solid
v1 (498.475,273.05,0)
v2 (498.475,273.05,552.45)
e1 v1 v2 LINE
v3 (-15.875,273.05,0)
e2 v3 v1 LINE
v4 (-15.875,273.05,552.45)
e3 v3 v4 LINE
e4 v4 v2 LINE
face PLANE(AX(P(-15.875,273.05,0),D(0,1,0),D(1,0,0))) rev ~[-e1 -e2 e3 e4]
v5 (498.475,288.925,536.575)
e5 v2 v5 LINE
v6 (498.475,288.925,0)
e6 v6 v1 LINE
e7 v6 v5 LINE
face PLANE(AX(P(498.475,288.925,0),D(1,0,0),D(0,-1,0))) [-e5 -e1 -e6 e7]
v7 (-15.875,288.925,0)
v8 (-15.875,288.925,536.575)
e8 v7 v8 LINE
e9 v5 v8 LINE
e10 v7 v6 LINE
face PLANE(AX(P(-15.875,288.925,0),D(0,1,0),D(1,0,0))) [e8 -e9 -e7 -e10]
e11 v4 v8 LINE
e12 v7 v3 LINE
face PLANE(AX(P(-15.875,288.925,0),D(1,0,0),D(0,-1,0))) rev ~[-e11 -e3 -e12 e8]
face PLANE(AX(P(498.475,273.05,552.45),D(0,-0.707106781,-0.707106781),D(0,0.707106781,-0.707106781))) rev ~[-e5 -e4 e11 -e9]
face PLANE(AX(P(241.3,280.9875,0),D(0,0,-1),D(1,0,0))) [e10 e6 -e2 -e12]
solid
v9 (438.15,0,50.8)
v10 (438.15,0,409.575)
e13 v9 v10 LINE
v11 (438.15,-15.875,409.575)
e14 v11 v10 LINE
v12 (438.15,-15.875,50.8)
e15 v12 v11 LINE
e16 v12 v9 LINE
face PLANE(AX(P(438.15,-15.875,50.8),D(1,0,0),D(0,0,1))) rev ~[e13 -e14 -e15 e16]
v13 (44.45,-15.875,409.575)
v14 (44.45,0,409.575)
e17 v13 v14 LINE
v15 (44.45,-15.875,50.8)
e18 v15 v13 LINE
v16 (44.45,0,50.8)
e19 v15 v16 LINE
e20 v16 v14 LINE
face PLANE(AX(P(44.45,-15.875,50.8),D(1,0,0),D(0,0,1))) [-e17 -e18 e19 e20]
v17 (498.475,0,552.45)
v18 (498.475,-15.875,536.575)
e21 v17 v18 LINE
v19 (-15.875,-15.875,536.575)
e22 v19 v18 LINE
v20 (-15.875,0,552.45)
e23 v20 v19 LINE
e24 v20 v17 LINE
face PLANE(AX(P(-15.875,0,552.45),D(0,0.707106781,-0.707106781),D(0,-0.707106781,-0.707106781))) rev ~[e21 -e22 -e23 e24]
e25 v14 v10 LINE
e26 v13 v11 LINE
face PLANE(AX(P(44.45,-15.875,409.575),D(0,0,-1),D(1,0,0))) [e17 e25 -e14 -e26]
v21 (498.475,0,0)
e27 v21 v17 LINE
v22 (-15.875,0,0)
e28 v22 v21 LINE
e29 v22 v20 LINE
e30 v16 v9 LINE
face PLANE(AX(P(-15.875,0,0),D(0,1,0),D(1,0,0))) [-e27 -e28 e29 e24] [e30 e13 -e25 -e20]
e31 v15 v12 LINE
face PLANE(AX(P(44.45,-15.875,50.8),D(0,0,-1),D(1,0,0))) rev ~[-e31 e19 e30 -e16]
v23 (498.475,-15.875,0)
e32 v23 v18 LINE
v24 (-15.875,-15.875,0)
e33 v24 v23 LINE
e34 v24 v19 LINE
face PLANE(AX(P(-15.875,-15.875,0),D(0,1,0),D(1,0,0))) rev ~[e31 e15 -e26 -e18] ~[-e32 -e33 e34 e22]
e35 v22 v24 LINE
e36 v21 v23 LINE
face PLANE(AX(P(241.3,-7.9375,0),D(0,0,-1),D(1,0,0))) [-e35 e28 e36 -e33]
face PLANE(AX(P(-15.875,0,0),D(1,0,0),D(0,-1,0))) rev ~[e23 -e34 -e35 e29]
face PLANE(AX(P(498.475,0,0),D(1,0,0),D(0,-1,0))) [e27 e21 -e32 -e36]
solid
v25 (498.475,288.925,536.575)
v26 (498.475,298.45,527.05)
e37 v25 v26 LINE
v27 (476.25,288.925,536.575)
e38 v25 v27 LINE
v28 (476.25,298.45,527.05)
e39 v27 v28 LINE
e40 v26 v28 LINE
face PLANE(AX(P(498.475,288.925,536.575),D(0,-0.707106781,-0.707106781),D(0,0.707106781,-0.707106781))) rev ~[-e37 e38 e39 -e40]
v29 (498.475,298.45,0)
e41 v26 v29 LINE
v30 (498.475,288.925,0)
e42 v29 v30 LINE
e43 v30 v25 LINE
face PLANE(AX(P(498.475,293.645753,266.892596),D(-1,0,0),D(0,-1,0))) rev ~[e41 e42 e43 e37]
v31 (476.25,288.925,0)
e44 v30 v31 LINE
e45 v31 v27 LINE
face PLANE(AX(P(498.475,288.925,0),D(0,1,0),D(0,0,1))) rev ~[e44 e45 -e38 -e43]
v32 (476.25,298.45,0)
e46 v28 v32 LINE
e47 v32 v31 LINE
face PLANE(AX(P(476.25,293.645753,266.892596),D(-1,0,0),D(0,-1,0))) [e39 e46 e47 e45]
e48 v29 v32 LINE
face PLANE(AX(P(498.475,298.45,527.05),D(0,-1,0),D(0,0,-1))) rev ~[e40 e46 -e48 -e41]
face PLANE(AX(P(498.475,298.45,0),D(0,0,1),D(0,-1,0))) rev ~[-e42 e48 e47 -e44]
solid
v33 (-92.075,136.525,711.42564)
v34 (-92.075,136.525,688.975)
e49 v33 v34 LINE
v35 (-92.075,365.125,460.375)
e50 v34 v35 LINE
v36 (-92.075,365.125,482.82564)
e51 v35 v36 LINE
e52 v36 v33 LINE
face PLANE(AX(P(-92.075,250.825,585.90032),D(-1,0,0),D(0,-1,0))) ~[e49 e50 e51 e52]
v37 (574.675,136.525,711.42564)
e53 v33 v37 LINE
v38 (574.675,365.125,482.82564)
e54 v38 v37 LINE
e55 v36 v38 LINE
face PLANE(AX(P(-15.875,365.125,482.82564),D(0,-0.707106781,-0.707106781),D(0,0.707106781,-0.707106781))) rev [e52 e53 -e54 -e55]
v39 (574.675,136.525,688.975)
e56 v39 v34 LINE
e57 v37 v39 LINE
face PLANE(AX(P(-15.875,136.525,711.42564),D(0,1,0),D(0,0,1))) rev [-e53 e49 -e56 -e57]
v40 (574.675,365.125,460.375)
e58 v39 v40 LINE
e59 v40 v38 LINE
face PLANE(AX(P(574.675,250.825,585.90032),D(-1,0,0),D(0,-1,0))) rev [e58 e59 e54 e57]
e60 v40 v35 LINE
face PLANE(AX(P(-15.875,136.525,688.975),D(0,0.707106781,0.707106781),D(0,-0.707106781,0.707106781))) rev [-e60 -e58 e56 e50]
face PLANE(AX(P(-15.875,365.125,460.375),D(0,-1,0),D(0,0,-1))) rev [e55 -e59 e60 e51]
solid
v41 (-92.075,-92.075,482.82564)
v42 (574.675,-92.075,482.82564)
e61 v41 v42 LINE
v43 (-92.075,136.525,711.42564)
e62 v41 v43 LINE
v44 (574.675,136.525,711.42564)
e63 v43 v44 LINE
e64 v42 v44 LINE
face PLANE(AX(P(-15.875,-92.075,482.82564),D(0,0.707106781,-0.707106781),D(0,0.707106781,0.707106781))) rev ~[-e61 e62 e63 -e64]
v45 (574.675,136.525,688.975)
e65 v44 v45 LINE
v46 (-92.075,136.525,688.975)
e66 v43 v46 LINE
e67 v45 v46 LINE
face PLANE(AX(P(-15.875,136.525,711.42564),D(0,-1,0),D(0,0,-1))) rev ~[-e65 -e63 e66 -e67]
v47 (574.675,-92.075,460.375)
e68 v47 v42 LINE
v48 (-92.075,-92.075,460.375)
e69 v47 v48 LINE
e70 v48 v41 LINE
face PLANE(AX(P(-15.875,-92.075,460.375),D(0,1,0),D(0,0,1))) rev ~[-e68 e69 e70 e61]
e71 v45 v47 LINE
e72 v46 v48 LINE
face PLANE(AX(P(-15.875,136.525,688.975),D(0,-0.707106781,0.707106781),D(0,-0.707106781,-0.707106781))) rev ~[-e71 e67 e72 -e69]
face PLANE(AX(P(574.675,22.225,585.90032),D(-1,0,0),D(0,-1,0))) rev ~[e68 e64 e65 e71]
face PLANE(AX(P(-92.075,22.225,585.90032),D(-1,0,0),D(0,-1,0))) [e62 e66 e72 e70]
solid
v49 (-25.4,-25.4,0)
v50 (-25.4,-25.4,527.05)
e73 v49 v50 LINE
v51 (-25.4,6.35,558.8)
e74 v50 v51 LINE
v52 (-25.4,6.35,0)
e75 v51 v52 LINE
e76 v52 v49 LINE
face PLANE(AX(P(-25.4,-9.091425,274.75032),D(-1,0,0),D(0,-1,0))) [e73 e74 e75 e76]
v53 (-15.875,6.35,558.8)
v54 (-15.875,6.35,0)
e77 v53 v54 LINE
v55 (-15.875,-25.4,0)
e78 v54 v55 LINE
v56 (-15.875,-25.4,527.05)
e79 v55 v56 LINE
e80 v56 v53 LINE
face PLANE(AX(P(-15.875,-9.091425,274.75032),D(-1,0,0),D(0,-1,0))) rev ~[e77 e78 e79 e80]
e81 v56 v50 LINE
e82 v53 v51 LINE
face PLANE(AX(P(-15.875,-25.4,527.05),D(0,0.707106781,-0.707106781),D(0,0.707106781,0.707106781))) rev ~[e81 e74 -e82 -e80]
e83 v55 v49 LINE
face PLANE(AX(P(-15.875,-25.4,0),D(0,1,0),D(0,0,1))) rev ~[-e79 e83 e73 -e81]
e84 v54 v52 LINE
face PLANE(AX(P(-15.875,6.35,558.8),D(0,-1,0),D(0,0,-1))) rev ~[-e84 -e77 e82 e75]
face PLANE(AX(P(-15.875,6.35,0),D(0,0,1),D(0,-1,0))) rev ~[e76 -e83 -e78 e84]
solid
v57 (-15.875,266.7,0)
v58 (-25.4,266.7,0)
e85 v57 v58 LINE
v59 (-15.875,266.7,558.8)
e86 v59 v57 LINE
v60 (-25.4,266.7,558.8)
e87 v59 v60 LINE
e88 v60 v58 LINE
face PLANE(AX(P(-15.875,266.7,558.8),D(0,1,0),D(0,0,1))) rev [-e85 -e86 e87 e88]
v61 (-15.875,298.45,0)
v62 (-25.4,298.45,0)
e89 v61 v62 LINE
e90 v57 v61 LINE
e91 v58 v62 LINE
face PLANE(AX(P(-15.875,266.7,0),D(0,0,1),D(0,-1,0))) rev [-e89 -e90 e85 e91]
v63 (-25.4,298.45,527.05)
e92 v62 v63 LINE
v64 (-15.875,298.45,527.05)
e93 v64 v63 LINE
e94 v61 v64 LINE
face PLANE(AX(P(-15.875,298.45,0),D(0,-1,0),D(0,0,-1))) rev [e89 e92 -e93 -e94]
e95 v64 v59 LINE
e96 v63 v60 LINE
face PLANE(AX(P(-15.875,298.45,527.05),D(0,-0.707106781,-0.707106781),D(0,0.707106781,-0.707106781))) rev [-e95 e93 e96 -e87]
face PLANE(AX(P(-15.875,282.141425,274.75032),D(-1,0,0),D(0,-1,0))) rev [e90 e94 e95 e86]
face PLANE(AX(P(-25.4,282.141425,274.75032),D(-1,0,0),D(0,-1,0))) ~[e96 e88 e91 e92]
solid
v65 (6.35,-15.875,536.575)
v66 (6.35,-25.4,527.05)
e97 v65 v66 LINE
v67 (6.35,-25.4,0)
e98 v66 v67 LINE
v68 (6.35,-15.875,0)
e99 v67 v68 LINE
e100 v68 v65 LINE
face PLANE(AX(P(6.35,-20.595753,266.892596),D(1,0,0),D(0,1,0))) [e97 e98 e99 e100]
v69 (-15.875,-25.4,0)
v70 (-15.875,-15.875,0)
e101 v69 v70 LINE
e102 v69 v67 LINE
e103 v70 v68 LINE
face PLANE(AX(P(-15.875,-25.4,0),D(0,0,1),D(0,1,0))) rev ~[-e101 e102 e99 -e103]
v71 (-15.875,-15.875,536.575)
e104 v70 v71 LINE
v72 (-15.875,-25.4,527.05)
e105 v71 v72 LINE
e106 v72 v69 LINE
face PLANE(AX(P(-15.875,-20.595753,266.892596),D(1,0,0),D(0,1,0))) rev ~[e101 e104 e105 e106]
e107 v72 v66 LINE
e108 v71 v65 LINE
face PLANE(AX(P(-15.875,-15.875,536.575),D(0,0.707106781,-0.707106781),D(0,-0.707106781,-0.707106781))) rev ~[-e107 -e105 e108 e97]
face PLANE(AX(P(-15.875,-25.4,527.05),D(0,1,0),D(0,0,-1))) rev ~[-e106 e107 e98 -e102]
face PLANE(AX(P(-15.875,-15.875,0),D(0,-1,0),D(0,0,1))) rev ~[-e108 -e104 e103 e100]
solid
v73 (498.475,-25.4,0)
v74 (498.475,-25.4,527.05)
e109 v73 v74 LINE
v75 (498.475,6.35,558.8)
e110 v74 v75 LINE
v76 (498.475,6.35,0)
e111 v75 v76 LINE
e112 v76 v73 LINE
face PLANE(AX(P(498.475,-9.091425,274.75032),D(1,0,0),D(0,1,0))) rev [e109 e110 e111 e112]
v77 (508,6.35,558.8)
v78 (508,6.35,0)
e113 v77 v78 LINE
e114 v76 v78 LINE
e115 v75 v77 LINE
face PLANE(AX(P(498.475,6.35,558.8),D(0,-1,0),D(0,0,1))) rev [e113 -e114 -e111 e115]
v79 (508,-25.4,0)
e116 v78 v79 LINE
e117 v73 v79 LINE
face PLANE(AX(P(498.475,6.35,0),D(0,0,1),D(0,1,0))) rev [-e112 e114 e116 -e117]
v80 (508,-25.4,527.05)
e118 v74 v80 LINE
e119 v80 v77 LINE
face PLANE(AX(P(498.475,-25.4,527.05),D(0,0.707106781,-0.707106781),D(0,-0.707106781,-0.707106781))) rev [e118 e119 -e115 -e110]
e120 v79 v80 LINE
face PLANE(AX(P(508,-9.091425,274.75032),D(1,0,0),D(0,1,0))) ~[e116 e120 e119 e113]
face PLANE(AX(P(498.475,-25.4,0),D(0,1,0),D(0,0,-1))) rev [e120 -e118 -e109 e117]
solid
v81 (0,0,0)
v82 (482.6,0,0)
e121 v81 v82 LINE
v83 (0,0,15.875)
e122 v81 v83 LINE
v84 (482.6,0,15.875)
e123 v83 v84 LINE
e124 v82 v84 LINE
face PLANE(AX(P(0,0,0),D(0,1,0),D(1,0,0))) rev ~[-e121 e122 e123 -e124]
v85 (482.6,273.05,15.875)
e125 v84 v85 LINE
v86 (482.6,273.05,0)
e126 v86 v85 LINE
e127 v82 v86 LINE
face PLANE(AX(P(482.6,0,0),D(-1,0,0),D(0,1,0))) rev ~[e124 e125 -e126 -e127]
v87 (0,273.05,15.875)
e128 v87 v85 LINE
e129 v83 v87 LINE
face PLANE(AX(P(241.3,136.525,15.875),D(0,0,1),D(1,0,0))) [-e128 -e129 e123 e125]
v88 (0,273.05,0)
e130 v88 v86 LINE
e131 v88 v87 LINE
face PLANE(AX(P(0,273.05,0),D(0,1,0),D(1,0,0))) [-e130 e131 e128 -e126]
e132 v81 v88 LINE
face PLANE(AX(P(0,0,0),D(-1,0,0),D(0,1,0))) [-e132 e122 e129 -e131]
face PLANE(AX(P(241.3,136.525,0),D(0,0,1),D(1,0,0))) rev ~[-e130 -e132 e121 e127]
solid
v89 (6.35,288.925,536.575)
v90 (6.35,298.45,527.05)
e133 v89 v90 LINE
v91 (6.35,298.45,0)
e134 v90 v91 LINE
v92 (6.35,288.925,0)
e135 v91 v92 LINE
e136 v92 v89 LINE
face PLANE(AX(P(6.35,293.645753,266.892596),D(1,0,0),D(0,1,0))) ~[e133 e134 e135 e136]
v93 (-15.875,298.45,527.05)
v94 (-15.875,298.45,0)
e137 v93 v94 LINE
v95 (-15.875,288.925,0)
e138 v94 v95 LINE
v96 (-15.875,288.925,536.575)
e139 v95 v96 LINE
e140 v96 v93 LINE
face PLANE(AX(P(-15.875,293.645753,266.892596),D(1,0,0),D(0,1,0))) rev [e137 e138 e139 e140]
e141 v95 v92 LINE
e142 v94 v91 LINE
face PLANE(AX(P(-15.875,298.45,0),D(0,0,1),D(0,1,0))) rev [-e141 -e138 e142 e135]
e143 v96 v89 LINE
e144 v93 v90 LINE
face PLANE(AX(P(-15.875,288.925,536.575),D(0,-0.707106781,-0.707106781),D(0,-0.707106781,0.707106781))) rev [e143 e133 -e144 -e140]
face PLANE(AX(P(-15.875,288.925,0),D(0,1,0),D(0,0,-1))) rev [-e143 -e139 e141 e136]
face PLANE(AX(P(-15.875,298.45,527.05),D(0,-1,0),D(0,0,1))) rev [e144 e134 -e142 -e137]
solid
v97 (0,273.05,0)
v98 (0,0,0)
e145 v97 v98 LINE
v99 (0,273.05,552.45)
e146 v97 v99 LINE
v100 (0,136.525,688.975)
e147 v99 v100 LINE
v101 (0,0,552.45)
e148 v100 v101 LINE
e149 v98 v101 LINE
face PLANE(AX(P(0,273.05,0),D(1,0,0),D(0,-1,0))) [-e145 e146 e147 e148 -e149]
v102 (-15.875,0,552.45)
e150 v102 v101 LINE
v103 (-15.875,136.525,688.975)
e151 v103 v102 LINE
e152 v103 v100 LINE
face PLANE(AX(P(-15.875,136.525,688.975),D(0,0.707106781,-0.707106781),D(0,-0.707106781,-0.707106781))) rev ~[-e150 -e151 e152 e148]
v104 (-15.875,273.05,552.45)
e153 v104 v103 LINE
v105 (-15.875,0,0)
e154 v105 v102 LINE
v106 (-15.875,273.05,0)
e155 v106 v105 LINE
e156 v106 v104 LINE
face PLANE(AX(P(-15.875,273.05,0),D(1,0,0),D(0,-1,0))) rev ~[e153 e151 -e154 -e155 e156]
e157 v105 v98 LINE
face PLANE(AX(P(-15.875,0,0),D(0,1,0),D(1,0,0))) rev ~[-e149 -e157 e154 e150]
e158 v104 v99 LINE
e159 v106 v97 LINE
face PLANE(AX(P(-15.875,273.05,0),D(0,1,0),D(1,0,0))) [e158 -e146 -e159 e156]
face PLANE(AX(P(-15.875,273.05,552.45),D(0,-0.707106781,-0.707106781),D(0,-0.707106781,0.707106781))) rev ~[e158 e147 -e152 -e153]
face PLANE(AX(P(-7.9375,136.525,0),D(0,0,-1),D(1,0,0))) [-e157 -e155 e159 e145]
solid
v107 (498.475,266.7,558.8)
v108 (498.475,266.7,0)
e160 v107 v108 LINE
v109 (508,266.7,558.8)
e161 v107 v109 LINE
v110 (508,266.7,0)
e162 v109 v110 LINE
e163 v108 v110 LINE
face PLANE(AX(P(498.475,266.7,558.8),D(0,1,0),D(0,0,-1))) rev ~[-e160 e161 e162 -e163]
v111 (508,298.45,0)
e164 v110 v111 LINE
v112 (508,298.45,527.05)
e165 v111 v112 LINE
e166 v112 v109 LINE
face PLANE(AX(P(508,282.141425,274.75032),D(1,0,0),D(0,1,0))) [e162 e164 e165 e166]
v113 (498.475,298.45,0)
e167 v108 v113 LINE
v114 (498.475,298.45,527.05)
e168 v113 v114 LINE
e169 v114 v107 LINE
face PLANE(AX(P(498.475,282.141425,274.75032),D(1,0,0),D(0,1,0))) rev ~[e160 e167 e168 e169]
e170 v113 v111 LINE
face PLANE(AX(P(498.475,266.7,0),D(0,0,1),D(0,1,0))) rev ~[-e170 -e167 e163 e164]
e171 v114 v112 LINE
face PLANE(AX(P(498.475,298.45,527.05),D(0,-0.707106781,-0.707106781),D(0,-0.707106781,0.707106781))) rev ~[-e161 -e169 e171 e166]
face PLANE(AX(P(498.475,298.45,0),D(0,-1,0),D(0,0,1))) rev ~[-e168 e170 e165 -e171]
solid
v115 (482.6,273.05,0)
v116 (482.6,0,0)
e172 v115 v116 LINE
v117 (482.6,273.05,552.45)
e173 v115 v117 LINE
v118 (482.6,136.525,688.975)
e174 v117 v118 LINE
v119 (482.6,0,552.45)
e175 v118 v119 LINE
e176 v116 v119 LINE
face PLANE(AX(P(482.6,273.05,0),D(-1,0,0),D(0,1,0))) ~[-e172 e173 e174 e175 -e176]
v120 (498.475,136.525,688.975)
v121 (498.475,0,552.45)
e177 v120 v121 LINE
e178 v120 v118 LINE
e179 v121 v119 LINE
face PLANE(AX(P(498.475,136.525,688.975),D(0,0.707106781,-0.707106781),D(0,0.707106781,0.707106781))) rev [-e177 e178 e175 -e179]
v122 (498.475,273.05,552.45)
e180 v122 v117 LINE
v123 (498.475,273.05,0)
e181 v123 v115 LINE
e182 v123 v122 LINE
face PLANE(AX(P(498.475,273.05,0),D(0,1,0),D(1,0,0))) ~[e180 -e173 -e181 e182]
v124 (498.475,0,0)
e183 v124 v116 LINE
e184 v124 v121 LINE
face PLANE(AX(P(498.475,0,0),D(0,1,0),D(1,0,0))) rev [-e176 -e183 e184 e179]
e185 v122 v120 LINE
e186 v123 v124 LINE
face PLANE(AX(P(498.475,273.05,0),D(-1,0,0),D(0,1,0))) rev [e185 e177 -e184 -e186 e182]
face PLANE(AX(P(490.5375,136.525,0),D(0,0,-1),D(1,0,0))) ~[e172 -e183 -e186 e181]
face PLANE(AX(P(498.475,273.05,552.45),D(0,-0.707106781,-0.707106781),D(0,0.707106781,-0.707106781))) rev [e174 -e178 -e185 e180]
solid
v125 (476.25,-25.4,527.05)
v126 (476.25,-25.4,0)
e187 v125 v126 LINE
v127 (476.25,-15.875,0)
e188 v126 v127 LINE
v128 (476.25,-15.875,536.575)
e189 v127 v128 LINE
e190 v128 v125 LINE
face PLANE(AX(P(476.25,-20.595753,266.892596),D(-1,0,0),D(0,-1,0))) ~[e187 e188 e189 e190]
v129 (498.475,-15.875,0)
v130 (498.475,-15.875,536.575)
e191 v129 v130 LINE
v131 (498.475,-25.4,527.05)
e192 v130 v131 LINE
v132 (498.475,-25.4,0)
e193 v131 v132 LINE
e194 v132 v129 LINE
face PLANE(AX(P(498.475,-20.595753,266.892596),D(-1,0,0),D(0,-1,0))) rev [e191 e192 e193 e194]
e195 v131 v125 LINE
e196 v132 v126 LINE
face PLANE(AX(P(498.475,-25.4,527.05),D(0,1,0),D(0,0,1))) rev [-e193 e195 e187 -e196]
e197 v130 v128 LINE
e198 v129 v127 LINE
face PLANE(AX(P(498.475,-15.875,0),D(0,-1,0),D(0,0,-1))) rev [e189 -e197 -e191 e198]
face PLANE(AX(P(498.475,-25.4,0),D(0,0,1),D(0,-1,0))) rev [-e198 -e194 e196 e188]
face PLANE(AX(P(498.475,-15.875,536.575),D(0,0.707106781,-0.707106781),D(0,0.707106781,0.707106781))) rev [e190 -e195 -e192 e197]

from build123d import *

# Parameters (mm, degrees)
F4_W           = 482.6
F4_H           = 273.05
F5_DEPTH       = 15.875
F6_W           = 15.875
F6_H           = 273.05
F7_DEPTH       = 688.975
F9_DEPTH       = 15.875
F12_W          = 514.35
F12_H          = 15.875
F13_DEPTH      = 552.45
F15_DEPTH      = 514.35
F16_W          = 514.35
F16_H          = 15.875
F17_DEPTH      = 552.45
F19_DEPTH      = 514.35
F20_W          = 393.7
F20_H          = 358.775
F21_DEPTH      = 15.875
F23_DEPTH      = 590.55
F23_DEPTH_BACK = 76.2
F28_DEPTH      = 9.525
F30_DEPTH      = 22.225


# Not quite as in the source:
# - a length typed as a fraction of an inch, garbled in the dataset ("3 / 203.2 mm" for 3/8 in), is restored


with BuildPart() as f5:
    # F4 (on Top) → F5 (new body)
    with BuildSketch(Plane.XY):
        with Locations((241.3, 136.525)):
            Rectangle(F4_W, F4_H)
    extrude(amount=F5_DEPTH)


with BuildPart() as f7:
    # F6 (on face) → F7 (new body)
    with BuildSketch(Plane(origin=(0, 0, 0), x_dir=(1, 0, 0), z_dir=(0, 0, -1))):
        with Locations((-7.9375, -136.525)):
            Rectangle(F6_W, F6_H)
    extrude(amount=-F7_DEPTH)

    # F8 (on face) → F9 (cut, through all)
    with BuildSketch(Plane(origin=(-15.875, 0, 0), x_dir=(0, -1, 0), z_dir=(-1, 0, 0))):
        Polygon((-273.05, 552.45), (-136.525, 688.975), (-273.05, 688.975), align=None)
        Polygon((0, 688.975), (-136.525, 688.975), (0, 552.45), align=None)
    extrude(amount=-F9_DEPTH, mode=Mode.SUBTRACT)


with BuildPart() as f11_1:
    # F11: instance of F7
    add(f7.part.mirror(Plane.YZ.offset(241.3)))


with BuildPart() as f13:
    # F12 (on face) → F13 (new body)
    with BuildSketch(Plane(origin=(0, 0, 0), x_dir=(1, 0, 0), z_dir=(0, 0, -1))):
        with Locations((241.3, -280.9875)):
            Rectangle(F12_W, F12_H)
    extrude(amount=-F13_DEPTH)

    # F14 (on face) → F15 (cut, through all)
    with BuildSketch(Plane.YZ.offset(498.475)):
        Polygon((288.925, 552.45), (273.05, 552.45), (288.925, 536.575), align=None)
    extrude(amount=-F15_DEPTH, mode=Mode.SUBTRACT)


with BuildPart() as f17:
    # F16 (on face) → F17 (new body)
    with BuildSketch(Plane(origin=(0, 0, 0), x_dir=(1, 0, 0), z_dir=(0, 0, -1))):
        with Locations((241.3, 7.9375)):
            Rectangle(F16_W, F16_H)
    extrude(amount=-F17_DEPTH)

    # F18 (on face) → F19 (cut, through all)
    with BuildSketch(Plane(origin=(-15.875, 0, 0), x_dir=(0, -1, 0), z_dir=(-1, 0, 0))):
        Polygon((15.875, 552.45), (0, 552.45), (15.875, 536.575), align=None)
    extrude(amount=-F19_DEPTH, mode=Mode.SUBTRACT)

    # F20 (on face) → F21 (cut, through all)
    with BuildSketch(Plane.XZ.offset(15.875)):
        with Locations((241.3, 230.1875)):
            Rectangle(F20_W, F20_H)
    extrude(amount=-F21_DEPTH, mode=Mode.SUBTRACT)


with BuildPart() as f23:
    # F22 (on face) → F23 (new body, two sides)
    with BuildSketch(Plane(origin=(-15.875, 0, 0), x_dir=(0, -1, 0), z_dir=(-1, 0, 0))) as f23_sk:
        Polygon((-136.525, 711.4256403027), (-136.525, 688.975), (92.075, 460.375), (92.075, 482.8256403027), align=None)
    extrude(amount=-F23_DEPTH)
    extrude(f23_sk.sketch, amount=F23_DEPTH_BACK)


with BuildPart() as f25_1:
    # F25: instance of F23
    add(f23.part.mirror(Plane.XZ.offset(-136.525)))


with BuildPart() as f28:
    # F27 (on face) → F28 (new body)
    with BuildSketch(Plane(origin=(-15.875, 0, 0), x_dir=(0, -1, 0), z_dir=(-1, 0, 0))):
        Polygon((25.4, 527.05), (-6.35, 558.8), (-6.35, 0), (25.4, 0), align=None)
    extrude(amount=F28_DEPTH)


with BuildPart() as f30:
    # F29 (on face) → F30 (new body)
    with BuildSketch(Plane.YZ.offset(-15.875)):
        Polygon((-15.875, 536.575), (-25.4, 527.05), (-25.4, 0), (-15.875, 0), align=None)
    extrude(amount=F30_DEPTH)


with BuildPart() as f31_1:
    # F31: instance of F30
    add(f30.part.mirror(Plane.XZ.offset(-136.525)))


with BuildPart() as f31_2:
    # F31: instance of F28
    add(f28.part.mirror(Plane.XZ.offset(-136.525)))


with BuildPart() as f32_1:
    # F32: instance of F28
    add(f28.part.mirror(Plane.YZ.offset(241.3)))


with BuildPart() as f32_2:
    # F32: instance of F30
    add(f30.part.mirror(Plane.YZ.offset(241.3)))


with BuildPart() as f32_3:
    # F32: instance of F31_2
    add(f31_2.part.mirror(Plane.YZ.offset(241.3)))


with BuildPart() as f32_4:
    # F32: instance of F31_1
    add(f31_1.part.mirror(Plane.YZ.offset(241.3)))


solid = Compound([f5.part, f7.part, f11_1.part, f13.part, f17.part, f23.part, f25_1.part, f28.part, f30.part, f31_1.part, f31_2.part, f32_1.part, f32_2.part, f32_3.part, f32_4.part])
